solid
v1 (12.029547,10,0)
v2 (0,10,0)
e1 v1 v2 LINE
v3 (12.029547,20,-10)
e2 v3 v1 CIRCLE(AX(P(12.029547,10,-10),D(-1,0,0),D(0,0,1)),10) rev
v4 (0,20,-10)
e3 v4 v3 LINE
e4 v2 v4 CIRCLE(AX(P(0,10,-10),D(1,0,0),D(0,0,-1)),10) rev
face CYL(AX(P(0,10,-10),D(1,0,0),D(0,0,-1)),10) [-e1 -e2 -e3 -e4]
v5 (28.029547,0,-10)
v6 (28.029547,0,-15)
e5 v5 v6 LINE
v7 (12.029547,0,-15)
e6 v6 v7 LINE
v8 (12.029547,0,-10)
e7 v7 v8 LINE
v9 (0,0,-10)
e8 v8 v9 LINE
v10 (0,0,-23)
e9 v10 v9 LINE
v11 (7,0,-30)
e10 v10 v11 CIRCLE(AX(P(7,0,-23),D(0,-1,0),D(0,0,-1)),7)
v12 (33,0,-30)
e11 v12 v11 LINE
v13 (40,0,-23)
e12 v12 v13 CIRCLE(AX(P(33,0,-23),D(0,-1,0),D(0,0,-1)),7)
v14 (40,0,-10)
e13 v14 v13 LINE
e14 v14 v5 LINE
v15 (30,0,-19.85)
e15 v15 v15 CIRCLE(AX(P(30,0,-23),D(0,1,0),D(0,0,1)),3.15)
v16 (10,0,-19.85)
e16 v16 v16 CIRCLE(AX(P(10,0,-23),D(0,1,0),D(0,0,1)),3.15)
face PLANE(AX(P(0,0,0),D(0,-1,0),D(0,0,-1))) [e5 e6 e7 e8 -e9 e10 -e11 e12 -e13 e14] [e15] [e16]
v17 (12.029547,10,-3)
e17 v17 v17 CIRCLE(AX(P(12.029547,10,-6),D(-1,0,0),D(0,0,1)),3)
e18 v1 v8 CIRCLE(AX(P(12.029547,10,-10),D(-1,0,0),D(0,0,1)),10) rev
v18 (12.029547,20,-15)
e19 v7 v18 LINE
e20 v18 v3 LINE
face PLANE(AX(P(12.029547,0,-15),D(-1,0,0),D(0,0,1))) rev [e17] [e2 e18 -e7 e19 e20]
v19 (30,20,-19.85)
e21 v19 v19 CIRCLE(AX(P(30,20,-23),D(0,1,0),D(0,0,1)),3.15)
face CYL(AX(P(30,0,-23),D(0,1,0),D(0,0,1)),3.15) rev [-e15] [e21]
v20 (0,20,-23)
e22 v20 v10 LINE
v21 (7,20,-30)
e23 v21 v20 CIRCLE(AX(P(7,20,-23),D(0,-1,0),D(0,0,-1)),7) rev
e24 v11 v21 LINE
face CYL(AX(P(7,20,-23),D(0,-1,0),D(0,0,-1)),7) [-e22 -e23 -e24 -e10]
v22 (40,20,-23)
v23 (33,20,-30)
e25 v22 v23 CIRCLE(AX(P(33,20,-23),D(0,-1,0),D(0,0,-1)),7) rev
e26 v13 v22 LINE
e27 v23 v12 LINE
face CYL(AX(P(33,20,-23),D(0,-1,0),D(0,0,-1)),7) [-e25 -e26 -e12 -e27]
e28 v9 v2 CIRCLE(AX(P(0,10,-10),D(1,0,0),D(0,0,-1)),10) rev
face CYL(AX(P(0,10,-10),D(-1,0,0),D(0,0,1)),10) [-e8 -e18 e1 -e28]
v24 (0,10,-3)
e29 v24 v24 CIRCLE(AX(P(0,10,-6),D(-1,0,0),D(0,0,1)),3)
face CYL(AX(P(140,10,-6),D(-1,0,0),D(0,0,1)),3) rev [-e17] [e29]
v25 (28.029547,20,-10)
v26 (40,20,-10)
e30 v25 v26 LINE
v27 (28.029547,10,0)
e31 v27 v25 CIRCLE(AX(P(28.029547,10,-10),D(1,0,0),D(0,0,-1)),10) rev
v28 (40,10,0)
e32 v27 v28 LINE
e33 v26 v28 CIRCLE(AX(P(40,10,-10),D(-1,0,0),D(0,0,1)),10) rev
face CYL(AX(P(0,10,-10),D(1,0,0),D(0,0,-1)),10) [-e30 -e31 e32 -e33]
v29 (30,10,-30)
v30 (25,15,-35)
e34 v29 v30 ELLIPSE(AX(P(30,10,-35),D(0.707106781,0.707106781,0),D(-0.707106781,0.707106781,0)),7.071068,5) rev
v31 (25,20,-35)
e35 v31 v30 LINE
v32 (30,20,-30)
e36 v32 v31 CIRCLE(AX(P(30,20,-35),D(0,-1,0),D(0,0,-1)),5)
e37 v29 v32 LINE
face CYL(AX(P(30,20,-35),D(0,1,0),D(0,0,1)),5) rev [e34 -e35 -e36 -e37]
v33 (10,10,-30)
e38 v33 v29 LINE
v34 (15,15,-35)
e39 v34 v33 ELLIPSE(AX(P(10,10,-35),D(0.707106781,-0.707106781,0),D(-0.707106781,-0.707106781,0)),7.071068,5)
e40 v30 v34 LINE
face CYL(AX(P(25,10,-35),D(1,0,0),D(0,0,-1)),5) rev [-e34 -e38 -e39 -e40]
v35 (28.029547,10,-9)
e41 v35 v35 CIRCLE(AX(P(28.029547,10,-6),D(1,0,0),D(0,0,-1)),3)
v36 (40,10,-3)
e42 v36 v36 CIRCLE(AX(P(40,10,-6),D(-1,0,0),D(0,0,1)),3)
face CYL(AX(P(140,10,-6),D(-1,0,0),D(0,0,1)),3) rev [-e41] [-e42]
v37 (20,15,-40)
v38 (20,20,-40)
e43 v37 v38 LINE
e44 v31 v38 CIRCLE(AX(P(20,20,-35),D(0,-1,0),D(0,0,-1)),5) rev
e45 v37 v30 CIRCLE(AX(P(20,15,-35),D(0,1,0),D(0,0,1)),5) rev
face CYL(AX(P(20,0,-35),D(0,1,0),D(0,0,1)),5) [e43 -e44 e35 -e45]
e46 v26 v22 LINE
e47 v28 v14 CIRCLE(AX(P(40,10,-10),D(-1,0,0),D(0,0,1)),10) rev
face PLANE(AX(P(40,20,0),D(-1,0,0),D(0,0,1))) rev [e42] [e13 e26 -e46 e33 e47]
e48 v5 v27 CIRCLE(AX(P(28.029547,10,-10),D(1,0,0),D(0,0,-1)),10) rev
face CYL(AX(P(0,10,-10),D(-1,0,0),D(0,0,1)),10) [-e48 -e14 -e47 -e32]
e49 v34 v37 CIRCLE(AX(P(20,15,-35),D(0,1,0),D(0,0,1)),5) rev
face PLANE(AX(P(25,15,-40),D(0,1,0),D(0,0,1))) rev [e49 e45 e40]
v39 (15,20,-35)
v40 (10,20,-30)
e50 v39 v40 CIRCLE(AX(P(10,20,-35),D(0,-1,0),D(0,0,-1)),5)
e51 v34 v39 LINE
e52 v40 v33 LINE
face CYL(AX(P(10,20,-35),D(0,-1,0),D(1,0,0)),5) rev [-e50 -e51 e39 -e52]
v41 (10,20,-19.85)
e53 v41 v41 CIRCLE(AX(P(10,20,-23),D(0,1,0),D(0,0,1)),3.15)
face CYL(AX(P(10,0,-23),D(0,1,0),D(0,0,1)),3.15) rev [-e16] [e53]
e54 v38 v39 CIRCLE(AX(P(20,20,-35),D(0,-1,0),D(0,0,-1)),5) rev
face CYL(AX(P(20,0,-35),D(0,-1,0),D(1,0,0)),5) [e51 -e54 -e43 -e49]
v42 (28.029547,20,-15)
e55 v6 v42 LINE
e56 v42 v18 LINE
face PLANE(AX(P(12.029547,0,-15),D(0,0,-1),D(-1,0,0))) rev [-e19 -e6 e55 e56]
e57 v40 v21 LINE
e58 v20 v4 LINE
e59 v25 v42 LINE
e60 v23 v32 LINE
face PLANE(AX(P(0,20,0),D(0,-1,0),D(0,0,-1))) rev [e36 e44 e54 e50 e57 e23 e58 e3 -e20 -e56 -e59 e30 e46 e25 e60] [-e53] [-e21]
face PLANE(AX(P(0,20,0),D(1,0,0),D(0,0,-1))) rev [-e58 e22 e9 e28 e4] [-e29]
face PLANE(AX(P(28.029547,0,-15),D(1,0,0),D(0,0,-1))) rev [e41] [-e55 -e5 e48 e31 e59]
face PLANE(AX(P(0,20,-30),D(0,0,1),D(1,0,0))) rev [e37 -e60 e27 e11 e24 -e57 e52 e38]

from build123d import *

# Parameters (mm, degrees)
SKETCH1_W           = 40
SKETCH1_H           = 30
BOSS_EXTRUDE1_DEPTH = 20
SKETCH2_R           = 3.15
SKETCH2_W           = 16
SKETCH2_H           = 15
CUT_EXTRUDE1_DEPTH  = 20
SKETCH3_W           = 10
SKETCH3_H           = 5
BOSS_EXTRUDE2_DEPTH = 10
FILLET3_R           = 5
FILLET4_R           = 5
SKETCH6_R           = 3
CUT_EXTRUDE3_DEPTH  = 140
FILLET5_R           = 10
FILLET6_R           = 5
FILLET7_R           = 7


with BuildPart() as part:
    # Sketch1 → Boss-Extrude1 (new body)
    with BuildSketch(Plane(origin=(0, 0, 0), x_dir=(1, 0, 0), z_dir=(0, 1, 0))):
        with Locations((20, 15)):
            Rectangle(SKETCH1_W, SKETCH1_H)
    extrude(amount=BOSS_EXTRUDE1_DEPTH)

    # Sketch2 → Cut-Extrude1 (cut)
    with BuildSketch(Plane(origin=(0, 20, 0), x_dir=(1, 0, 0), z_dir=(0, 1, 0))):
        with Locations(Location((10, 23, 0), (0, 0, 270))):
            Circle(SKETCH2_R)
        with Locations(Location((30, 23, 0), (0, 0, 270))):
            Circle(SKETCH2_R)
        with Locations((20.029547187, 7.5)):
            Rectangle(SKETCH2_W, SKETCH2_H)
    extrude(amount=-CUT_EXTRUDE1_DEPTH, mode=Mode.SUBTRACT)

    # Sketch3 → Boss-Extrude2 (add)
    with BuildSketch(Plane(origin=(0, 0, -30), x_dir=(-1, 0, 0), z_dir=(0, 0, -1))):
        with Locations((-20, 17.5)):
            Rectangle(SKETCH3_W, SKETCH3_H)
    extrude(amount=BOSS_EXTRUDE2_DEPTH)

    # Fillet3
    fillet3_edges = [part.edges().sort_by_distance(p)[0] for p in [
        (25, 17.5, -30),
        (15, 17.5, -30),
    ]]
    fillet(fillet3_edges, radius=FILLET3_R)

    # Fillet4
    fillet4_edges = [part.edges().sort_by_distance(p)[0] for p in [
        (20, 15, -30),
    ]]
    fillet(fillet4_edges, radius=FILLET4_R)

    # Sketch6 → Cut-Extrude3 (cut)
    with BuildSketch(Plane.ZY):
        with Locations((-6, 10)):
            Circle(SKETCH6_R)
    extrude(amount=-CUT_EXTRUDE3_DEPTH, mode=Mode.SUBTRACT)

    # Fillet5
    fillet5_edges = [part.edges().sort_by_distance(p)[0] for p in [
        (34.014773594, 20, 0),
        (34.014773594, 0, 0),
        (6.014773594, 0, 0),
        (6.014773594, 20, 0),
    ]]
    fillet(fillet5_edges, radius=FILLET5_R - 0.0001)  # a hair under: the kernel refuses the full size

    # Fillet6
    fillet6_edges = [part.edges().sort_by_distance(p)[0] for p in [
        (25, 17.5, -40),
        (15, 17.5, -40),
    ]]
    fillet(fillet6_edges, radius=FILLET6_R - 0.0001)  # a hair under: the kernel refuses the full size

    # Fillet7
    fillet7_edges = [part.edges().sort_by_distance(p)[0] for p in [
        (0, 10, -30),
        (40, 10, -30),
    ]]
    fillet(fillet7_edges, radius=FILLET7_R)


solid = part.part
